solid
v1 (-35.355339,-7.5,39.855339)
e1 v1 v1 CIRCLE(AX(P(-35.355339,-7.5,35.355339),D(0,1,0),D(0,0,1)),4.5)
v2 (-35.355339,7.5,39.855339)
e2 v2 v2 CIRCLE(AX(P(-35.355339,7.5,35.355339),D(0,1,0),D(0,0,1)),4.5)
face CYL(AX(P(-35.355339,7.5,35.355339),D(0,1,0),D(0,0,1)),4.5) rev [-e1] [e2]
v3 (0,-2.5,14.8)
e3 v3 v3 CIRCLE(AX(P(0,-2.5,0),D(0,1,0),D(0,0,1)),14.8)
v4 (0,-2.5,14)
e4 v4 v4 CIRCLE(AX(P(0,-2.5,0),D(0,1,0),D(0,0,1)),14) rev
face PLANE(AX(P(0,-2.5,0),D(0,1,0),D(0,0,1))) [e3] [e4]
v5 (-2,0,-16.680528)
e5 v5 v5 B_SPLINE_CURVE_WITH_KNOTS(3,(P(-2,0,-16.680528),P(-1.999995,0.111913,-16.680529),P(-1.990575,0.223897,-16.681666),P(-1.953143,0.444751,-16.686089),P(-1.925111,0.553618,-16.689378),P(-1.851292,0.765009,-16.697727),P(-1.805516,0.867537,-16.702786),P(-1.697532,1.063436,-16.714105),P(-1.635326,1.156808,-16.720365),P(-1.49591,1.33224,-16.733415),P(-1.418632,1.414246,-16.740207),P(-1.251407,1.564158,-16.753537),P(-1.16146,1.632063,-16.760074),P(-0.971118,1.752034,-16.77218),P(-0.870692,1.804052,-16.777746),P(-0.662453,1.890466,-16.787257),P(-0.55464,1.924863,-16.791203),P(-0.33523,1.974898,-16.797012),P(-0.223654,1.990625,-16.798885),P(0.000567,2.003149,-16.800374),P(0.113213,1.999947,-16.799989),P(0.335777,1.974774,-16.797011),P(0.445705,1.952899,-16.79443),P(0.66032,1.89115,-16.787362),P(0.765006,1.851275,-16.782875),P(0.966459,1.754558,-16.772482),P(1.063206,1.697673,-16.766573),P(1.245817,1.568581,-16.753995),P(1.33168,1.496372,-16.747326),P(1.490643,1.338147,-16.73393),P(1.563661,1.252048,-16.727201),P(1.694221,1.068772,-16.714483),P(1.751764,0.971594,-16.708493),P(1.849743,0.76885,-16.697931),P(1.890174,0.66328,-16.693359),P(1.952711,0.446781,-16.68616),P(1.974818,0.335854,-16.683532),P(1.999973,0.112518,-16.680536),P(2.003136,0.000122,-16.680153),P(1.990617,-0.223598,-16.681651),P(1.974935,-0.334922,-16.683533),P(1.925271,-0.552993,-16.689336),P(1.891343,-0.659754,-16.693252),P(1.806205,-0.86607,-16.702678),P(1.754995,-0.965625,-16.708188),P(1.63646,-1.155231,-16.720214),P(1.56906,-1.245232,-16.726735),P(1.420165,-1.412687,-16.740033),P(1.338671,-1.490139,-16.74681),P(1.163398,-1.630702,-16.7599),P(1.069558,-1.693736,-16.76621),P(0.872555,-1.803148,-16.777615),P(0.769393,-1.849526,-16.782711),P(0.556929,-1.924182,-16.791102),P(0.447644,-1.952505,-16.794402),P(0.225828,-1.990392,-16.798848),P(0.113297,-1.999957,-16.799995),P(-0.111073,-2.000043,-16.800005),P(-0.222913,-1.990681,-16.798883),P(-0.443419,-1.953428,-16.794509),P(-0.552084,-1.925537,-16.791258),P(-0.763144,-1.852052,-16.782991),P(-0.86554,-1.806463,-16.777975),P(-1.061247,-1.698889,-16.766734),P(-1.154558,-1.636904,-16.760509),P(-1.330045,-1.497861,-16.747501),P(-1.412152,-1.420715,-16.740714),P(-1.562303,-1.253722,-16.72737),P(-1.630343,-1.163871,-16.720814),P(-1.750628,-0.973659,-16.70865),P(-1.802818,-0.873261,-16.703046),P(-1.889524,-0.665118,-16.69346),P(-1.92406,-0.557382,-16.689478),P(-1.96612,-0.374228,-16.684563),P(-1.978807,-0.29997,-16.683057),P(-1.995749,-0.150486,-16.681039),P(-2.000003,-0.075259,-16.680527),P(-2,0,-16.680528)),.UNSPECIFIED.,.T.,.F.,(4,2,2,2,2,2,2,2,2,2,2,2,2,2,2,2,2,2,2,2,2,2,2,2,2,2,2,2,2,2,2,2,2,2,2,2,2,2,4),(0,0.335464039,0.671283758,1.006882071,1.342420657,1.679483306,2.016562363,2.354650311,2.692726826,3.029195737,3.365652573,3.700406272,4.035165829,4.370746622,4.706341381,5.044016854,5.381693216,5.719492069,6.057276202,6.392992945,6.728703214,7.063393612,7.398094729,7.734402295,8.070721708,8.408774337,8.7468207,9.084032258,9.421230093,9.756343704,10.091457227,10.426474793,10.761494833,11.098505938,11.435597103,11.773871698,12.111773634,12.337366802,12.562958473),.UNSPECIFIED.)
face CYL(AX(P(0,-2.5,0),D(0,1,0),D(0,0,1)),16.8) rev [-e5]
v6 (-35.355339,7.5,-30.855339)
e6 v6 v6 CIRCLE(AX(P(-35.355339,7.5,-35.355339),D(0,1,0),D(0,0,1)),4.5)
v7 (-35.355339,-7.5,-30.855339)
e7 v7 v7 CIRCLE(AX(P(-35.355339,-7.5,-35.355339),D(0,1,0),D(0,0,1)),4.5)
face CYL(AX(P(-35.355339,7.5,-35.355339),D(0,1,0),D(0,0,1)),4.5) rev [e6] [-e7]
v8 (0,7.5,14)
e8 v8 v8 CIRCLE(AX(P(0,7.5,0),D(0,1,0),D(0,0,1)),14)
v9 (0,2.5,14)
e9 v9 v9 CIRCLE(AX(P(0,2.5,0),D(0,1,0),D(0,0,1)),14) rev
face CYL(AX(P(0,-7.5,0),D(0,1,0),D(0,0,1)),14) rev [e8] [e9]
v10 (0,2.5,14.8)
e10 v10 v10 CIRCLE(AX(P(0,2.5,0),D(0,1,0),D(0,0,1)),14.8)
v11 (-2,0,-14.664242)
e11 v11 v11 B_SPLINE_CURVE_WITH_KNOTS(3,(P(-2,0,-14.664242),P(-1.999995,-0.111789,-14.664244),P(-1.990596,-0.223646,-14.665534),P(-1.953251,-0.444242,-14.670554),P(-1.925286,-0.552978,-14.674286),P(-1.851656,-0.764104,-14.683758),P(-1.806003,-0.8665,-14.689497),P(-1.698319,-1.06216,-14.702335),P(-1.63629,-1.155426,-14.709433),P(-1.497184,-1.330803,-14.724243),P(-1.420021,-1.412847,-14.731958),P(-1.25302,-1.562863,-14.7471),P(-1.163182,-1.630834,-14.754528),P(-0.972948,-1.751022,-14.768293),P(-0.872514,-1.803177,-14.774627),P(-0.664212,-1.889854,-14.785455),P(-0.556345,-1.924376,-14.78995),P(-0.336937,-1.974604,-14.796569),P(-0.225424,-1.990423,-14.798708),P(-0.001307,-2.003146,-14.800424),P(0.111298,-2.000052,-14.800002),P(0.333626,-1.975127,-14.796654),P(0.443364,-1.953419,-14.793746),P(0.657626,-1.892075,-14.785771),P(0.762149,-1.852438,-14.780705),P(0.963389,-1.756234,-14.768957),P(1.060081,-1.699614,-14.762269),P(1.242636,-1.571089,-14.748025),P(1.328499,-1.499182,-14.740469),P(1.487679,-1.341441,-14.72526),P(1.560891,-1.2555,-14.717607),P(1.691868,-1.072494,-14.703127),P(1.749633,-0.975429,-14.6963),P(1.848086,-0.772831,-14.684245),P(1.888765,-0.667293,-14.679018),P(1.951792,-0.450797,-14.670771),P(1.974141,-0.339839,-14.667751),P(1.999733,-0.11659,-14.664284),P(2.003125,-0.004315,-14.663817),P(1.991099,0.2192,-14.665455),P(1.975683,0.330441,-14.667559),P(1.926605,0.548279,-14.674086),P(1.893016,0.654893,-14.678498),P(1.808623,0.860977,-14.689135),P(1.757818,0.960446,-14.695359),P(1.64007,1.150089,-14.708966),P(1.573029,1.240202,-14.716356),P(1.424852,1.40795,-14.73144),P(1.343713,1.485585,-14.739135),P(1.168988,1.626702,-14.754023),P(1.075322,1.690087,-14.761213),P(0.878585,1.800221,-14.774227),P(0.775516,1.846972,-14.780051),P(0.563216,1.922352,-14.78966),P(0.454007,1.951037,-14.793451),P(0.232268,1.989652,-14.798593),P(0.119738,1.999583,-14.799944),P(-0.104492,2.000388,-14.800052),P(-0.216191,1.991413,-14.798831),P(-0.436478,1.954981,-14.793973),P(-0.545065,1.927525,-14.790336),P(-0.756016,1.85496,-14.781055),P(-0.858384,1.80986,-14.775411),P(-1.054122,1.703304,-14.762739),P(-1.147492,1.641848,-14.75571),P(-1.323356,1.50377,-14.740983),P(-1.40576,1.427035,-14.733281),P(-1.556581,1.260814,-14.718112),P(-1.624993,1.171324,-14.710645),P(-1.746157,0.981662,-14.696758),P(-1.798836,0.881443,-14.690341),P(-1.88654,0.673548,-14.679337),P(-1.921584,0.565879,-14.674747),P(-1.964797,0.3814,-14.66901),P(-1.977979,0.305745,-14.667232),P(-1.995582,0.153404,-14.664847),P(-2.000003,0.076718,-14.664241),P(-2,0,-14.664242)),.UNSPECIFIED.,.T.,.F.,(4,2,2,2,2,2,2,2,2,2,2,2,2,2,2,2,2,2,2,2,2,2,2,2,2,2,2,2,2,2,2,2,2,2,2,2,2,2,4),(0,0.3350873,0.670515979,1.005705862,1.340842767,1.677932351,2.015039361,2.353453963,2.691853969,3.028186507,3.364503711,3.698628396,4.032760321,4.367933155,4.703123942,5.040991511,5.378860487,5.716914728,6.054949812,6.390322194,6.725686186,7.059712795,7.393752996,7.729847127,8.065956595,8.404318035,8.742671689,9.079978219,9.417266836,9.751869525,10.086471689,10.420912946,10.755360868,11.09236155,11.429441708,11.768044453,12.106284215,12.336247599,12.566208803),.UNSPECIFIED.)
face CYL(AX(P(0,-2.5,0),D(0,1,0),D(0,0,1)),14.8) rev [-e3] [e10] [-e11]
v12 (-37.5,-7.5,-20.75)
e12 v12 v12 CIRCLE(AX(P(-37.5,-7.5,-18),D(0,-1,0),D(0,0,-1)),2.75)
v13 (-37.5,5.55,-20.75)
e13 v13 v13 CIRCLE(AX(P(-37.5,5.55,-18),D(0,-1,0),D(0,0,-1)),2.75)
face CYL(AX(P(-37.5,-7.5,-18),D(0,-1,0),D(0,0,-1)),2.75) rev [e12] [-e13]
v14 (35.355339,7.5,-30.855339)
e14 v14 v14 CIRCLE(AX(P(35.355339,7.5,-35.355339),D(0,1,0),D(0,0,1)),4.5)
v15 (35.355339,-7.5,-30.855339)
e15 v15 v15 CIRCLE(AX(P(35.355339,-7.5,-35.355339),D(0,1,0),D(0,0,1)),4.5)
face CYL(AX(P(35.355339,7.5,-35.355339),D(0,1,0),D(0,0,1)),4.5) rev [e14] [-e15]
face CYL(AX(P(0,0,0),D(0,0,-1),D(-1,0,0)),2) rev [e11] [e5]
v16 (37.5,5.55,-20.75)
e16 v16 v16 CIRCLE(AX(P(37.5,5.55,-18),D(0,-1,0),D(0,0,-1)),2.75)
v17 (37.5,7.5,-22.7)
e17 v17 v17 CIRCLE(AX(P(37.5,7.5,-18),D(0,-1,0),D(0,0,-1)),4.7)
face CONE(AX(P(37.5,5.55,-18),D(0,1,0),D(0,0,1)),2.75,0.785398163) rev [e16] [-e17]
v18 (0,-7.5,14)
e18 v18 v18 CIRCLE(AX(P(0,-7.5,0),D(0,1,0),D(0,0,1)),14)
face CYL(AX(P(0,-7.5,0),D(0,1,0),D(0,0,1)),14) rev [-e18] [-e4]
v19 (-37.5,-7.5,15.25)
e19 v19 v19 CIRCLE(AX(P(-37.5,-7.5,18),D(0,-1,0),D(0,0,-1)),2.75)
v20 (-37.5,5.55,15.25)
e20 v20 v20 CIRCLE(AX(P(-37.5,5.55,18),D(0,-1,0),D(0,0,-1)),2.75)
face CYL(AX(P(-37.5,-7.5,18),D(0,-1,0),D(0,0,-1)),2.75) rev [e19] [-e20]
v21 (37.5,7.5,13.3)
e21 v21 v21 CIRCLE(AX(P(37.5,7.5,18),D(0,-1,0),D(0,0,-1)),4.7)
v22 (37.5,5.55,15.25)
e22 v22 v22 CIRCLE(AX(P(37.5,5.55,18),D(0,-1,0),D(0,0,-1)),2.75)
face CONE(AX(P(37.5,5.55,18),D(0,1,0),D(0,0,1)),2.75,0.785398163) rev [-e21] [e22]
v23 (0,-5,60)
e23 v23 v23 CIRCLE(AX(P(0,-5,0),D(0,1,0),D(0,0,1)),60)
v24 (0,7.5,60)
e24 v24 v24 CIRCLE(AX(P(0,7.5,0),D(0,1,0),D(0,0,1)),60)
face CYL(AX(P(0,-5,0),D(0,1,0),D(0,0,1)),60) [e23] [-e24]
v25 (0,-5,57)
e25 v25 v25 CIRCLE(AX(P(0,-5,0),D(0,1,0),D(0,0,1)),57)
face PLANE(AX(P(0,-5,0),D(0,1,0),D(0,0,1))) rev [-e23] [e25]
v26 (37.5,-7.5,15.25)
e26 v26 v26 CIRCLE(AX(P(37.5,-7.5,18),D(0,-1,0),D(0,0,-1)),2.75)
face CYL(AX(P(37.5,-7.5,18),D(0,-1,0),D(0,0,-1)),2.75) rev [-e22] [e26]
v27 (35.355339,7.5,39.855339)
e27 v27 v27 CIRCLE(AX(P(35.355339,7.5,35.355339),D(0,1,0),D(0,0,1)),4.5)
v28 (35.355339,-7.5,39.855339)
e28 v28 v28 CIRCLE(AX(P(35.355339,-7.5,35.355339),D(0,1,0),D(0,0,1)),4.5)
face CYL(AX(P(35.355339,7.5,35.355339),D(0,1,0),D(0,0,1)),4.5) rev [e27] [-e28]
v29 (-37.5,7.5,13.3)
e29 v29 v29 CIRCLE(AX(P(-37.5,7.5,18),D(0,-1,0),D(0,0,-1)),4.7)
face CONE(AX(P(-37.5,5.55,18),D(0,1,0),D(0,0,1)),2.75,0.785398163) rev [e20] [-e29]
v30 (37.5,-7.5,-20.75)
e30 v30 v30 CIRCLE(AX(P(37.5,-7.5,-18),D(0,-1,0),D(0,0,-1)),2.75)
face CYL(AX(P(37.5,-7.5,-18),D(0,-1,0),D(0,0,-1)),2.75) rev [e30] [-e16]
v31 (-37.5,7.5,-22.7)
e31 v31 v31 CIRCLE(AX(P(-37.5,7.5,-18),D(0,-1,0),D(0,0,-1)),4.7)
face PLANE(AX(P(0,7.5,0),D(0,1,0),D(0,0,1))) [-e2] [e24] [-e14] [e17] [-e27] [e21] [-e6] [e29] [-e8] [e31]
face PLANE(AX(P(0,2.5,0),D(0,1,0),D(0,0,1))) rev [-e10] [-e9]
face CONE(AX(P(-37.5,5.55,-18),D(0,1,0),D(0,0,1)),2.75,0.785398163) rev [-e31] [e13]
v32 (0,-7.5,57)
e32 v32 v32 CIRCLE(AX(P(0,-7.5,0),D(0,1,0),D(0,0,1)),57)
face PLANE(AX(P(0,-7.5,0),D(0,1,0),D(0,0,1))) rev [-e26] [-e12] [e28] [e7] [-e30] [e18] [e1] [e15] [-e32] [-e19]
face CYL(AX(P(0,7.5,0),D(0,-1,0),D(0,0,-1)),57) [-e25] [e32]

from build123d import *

# Parameters (mm, degrees)
SKETCH1_R                     = 57
EXTRUDE4_DEPTH                = 7.5
EXTRUDE5_DEPTH                = 7.5
EXTRUDE5_DEPTH_BACK           = 5
SKETCH_R                      = 60
SKETCH_R_2                    = 57
SKETCH2_R                     = 14
EXTRUDE6_DEPTH                = 87.168439698
SKETCH6_R                     = 14.8
EXTRUDE7_DEPTH                = 2.5
EXTRUDE8_START                = -16.8000001
EXTRUDE8_OUTLINE_R            = 2
EXTRUDE8_DEPTH                = 2.135757978
EXTRUDE8_START_2              = -3
EXTRUDE8_2_DEPTH              = 6
M8_CLEARANCE_HOLE1_D          = 9
CIRPATTERN1_COUNT             = 4
M5_CLEARANCE_HOLE1_AT_2_COUNT = 2
M5_CLEARANCE_HOLE1_AT_2_PITCH = 36
M5_CLEARANCE_HOLE1_AT_3_COUNT = 2
M5_CLEARANCE_HOLE1_AT_3_PITCH = 83.192547743
M5_CLEARANCE_HOLE1_AT_4_COUNT = 2
M5_CLEARANCE_HOLE1_AT_4_PITCH = 75


with BuildPart() as part:
    # Sketch1 → Extrude4 (new, symmetric)
    with BuildSketch(Plane(origin=(0, 0, 0), x_dir=(1, 0, 0), z_dir=(0, 1, 0))):
        with Locations(Location((0, 0, 0), (0, 0, 270))):
            Circle(SKETCH1_R)
    extrude(amount=EXTRUDE4_DEPTH, both=True)

    # Sketch → Extrude5 (add, two sides: drawn at the far end of the back side and taken through both)
    with BuildSketch(Plane(origin=(0, 0, 0), x_dir=(1, 0, 0), z_dir=(0, 1, 0)).offset(-EXTRUDE5_DEPTH_BACK)):
        with Locations(Location((0, 0, 0), (0, 0, 270))):
            Circle(SKETCH_R)
        with Locations(Location((0, 0, 0), (0, 0, 270))):
            Circle(SKETCH_R_2, mode=Mode.SUBTRACT)
    extrude(amount=EXTRUDE5_DEPTH + EXTRUDE5_DEPTH_BACK)

    # Sketch2 → Extrude6 (cut, through all)
    with BuildSketch(Plane(origin=(0, 7.5, 0), x_dir=(1, 0, 0), z_dir=(0, 1, 0))):
        with Locations(Location((0, 0, 0), (0, 0, 270))):
            Circle(SKETCH2_R)
    extrude(amount=-EXTRUDE6_DEPTH, mode=Mode.SUBTRACT)

    # Sketch6 → Extrude7 (cut, symmetric)
    with BuildSketch(Plane(origin=(0, 0, 0), x_dir=(1, 0, 0), z_dir=(0, 1, 0))):
        with Locations(Location((0, 0, 0), (0, 0, 270))):
            Circle(SKETCH6_R)
    extrude(amount=EXTRUDE7_DEPTH, both=True, mode=Mode.SUBTRACT)

    # Extrude8: read off the stored shape, not the designer's step
    # Extrude8 outline → Extrude8 (cut)
    with BuildSketch(Plane.XY.offset(EXTRUDE8_START)):
        Circle(EXTRUDE8_OUTLINE_R)
    extrude(amount=EXTRUDE8_DEPTH, mode=Mode.SUBTRACT)

    # Extrude8 2 outline → Extrude8 2 (add)
    with BuildSketch(Plane(origin=(0, 0, 0), x_dir=(1, 0, 0), z_dir=(0, 1, 0)).offset(EXTRUDE8_START_2)):
        with BuildLine():
            ThreePointArc((-2e-09, 16.8), (1.002059984, 16.770088723), (2.000551768, 16.680461403))
            Line((2.000551768, 16.680461403), (3, 16.56059374))
            Line((3, 16.56059374), (3, 16.8000001))
            Line((3, 16.8000001), (-2e-09, 16.8))
        make_face()
        with BuildLine():
            ThreePointArc((-2.000001192, 16.680527427), (-1.001783219, 16.770105259), (-2e-09, 16.8))
            Line((-2e-09, 16.8), (-3, 16.8000001))
            Line((-3, 16.8000001), (-3, 16.560627213))
            Line((-3, 16.560627213), (-2.000001192, 16.680527427))
        make_face()
    extrude(amount=EXTRUDE8_2_DEPTH)

    # M8 Clearance Hole1 (through all)
    with Locations(Plane(origin=(0, 7.5, 0), x_dir=(1, 0, 0), z_dir=(0, 1, 0))):
        with Locations((-35.355339059, -35.355339059)):
            m8_clearance_hole1 = Hole(M8_CLEARANCE_HOLE1_D / 2)

    # CirPattern1: M8 Clearance Hole1 ×4 about axis
    cirpattern1_axis = Axis((0, 0, 0), (0, 1, 0))
    for i in range(1, CIRPATTERN1_COUNT):
        add(m8_clearance_hole1.rotate(cirpattern1_axis, i * 360 / CIRPATTERN1_COUNT), mode=Mode.SUBTRACT)

    # Sketch10 → M5 Clearance Hole1 (revolve, cut)
    with BuildSketch(Plane(origin=(37.5, -7.5, 18), x_dir=(0, 0, -1), z_dir=(1, 0, 0))):
        Polygon((0, 0), (0, 15), (4.7, 15), (2.75, 13.05), (2.75, 0), align=None)
    m5_clearance_hole1 = revolve(axis=Axis((37.5, -13.85, 18), (0, 1, 0)), mode=Mode.SUBTRACT)

    # M5 Clearance Hole1 at 2: M5 Clearance Hole1 ×2
    with Locations(*[(0, 0, -i * M5_CLEARANCE_HOLE1_AT_2_PITCH) for i in range(1, M5_CLEARANCE_HOLE1_AT_2_COUNT)]):
        add(m5_clearance_hole1, mode=Mode.SUBTRACT)

    # M5 Clearance Hole1 at 3: M5 Clearance Hole1 ×2
    with Locations(*[Vector(-0.9015230574682735, 0, -0.4327310675847715) * (i * M5_CLEARANCE_HOLE1_AT_3_PITCH) for i in range(1, M5_CLEARANCE_HOLE1_AT_3_COUNT)]):
        add(m5_clearance_hole1, mode=Mode.SUBTRACT)

    # M5 Clearance Hole1 at 4: M5 Clearance Hole1 ×2
    with Locations(*[(-i * M5_CLEARANCE_HOLE1_AT_4_PITCH, 0, 0) for i in range(1, M5_CLEARANCE_HOLE1_AT_4_COUNT)]):
        add(m5_clearance_hole1, mode=Mode.SUBTRACT)


solid = part.part
